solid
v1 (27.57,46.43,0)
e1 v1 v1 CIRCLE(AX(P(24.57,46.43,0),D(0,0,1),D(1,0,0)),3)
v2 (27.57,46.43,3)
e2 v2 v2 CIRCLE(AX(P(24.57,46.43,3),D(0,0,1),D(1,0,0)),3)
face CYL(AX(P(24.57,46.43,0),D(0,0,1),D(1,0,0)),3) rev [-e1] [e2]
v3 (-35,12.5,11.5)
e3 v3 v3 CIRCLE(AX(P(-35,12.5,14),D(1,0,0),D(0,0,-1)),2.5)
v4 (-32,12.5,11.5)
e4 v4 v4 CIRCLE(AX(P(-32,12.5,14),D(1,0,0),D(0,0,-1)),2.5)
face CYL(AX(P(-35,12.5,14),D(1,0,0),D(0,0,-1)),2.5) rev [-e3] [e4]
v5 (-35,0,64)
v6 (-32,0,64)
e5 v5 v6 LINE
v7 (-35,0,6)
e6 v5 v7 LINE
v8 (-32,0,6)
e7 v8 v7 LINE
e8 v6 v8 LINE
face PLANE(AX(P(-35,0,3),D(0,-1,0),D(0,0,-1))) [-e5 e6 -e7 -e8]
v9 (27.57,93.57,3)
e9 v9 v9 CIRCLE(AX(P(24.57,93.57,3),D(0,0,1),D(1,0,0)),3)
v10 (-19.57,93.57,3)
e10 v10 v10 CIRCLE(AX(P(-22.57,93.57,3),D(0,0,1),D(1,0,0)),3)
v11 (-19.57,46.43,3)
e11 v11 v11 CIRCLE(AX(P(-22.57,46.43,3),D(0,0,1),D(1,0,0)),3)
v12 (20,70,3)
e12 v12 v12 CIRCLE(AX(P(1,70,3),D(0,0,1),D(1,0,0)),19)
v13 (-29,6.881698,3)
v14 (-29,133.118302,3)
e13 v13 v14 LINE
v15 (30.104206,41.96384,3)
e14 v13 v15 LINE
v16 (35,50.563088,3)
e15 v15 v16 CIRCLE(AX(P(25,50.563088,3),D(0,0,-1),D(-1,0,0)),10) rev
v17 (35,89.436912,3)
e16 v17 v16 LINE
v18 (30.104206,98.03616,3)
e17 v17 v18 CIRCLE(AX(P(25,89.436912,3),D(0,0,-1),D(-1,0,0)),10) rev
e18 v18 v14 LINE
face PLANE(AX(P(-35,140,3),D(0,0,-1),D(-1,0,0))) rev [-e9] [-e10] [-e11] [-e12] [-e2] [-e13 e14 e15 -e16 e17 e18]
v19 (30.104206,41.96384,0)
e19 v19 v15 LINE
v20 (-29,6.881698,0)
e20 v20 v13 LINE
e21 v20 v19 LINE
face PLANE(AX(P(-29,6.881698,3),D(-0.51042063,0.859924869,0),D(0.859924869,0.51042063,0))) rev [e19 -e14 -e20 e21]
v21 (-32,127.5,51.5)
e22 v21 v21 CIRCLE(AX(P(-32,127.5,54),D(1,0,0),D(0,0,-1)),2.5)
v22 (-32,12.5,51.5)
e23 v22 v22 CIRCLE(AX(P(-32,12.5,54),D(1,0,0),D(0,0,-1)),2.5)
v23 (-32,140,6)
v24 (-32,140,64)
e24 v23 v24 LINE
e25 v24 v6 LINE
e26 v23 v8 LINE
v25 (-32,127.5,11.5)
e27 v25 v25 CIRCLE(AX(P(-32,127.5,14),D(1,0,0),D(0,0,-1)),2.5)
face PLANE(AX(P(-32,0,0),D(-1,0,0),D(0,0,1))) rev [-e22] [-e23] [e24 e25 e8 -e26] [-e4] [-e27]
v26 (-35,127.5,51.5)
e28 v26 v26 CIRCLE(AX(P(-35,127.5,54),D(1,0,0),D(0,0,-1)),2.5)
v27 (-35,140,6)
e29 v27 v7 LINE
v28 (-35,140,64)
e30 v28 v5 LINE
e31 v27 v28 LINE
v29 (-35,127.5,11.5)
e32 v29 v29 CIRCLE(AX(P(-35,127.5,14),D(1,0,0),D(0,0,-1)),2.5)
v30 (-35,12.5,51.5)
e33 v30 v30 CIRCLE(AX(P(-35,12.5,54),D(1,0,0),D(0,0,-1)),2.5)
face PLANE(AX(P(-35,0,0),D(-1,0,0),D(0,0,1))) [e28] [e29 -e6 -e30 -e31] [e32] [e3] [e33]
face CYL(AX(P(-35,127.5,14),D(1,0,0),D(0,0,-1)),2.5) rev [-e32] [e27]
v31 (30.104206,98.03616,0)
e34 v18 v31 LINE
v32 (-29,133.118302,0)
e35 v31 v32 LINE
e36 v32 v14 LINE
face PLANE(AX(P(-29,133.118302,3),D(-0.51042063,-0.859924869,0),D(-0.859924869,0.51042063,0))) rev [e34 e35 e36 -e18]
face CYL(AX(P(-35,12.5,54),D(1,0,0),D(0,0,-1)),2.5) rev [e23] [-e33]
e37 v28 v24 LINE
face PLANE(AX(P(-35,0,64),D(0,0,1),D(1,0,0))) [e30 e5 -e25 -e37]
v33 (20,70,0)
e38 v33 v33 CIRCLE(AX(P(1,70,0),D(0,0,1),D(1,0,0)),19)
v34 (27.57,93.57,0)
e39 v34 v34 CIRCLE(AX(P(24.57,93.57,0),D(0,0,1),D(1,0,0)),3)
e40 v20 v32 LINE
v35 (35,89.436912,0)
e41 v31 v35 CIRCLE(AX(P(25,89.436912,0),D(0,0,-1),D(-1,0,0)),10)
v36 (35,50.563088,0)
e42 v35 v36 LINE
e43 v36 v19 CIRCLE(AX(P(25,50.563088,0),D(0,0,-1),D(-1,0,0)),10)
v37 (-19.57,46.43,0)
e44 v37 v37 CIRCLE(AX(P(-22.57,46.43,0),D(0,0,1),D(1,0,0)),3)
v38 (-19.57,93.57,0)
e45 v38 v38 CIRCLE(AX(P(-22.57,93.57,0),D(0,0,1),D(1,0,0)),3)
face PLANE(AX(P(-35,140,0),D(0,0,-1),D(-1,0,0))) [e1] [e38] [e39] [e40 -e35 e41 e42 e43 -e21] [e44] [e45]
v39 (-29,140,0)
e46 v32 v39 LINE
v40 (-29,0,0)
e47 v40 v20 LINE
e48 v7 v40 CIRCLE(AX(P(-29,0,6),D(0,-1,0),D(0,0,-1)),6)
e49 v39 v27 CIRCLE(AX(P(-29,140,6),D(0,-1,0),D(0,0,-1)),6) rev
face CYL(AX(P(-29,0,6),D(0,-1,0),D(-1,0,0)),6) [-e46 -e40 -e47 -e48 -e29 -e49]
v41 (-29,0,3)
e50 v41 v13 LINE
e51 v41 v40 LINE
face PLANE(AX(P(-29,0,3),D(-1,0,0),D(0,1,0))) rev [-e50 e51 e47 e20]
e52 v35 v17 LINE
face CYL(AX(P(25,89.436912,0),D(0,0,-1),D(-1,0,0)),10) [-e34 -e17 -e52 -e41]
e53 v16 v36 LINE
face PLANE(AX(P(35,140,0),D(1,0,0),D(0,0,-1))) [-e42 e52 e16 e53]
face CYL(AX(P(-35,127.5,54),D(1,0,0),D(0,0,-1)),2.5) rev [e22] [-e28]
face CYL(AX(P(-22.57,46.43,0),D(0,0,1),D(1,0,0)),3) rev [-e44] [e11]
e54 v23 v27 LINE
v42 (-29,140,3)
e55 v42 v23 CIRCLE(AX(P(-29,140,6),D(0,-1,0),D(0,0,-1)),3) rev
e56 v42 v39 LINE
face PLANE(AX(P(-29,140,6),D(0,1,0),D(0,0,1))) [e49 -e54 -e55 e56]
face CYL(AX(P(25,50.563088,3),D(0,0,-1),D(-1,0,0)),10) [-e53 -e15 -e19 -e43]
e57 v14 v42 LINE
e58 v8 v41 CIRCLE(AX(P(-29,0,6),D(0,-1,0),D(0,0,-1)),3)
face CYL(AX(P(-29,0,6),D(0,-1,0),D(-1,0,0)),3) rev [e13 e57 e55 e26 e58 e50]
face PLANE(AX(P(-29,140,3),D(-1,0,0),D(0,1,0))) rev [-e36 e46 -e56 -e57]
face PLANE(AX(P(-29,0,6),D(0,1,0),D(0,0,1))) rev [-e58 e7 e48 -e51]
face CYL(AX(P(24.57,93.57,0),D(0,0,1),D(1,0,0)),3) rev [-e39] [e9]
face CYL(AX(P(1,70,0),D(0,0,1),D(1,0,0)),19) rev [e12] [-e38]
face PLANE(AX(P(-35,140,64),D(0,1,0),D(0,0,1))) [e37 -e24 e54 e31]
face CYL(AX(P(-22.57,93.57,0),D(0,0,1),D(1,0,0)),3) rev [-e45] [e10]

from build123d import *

# Parameters (mm, degrees)
SKETCH1_W                    = 70
SKETCH1_H                    = 3
BASE_FLANGE1_DEPTH           = 140
EDGE_FLANGE1_STRIP_W         = 18
EDGE_FLANGE1_STRIP_H         = 3
EDGE_FLANGE1_STRIP_CUT_DEPTH = 140
EDGE_FLANGE1_DEPTH           = 140
SKETCH9_R                    = 19
SKETCH9_R_2                  = 3
CUT_EXTRUDE1_DEPTH           = 10
SKETCH10_R                   = 2.5
CUT_EXTRUDE2_DEPTH           = 10
SKETCH11_R                   = 2.5
CUT_EXTRUDE3_DEPTH           = 3
CUT_EXTRUDE4_DEPTH           = 10
FILLET1_R                    = 10
FILLET2_R                    = 10


# Sheet-metal steps are written as plain solids
with BuildPart() as part:
    # Sketch1 → Base-Flange1 (new body)
    with BuildSketch(Plane(origin=(0, 0, 0), x_dir=(1, 0, 0), z_dir=(0, 1, 0))):
        with Locations((0, -1.5)):
            Rectangle(SKETCH1_W, SKETCH1_H)
    extrude(amount=BASE_FLANGE1_DEPTH)

    # Edge-Flange1 strip (across the edge) → Edge-Flange1 strip cut (cut)
    with BuildSketch(Plane(origin=(-35, 140, 3), x_dir=(1, 0, 0), z_dir=(0, -1, 0))):
        with Locations((-3, -1.5)):
            Rectangle(EDGE_FLANGE1_STRIP_W, EDGE_FLANGE1_STRIP_H)
    extrude(amount=EDGE_FLANGE1_STRIP_CUT_DEPTH, mode=Mode.SUBTRACT)

    # Edge-Flange1 section (across the edge) → Edge-Flange1 (add)
    with BuildSketch(Plane(origin=(-35, 140, 3), x_dir=(1, 0, 0), z_dir=(0, -1, 0))):
        with BuildLine():
            Line((0, 3), (0, 61))
            Line((0, 61), (3, 61))
            Line((3, 61), (3, 3))
            ThreePointArc((3, 3), (3.878679656, 0.878679656), (6, 0))
            Line((6, 0), (6, -3))
            ThreePointArc((6, -3), (1.757359313, -1.242640687), (0, 3))
        make_face()
    extrude(amount=EDGE_FLANGE1_DEPTH)

    # Sketch9 → Cut-Extrude1 (cut)
    with BuildSketch(Plane.XY.offset(3)):
        with Locations((1, 70)):
            Circle(SKETCH9_R)
        with Locations((-22.57, 93.57)):
            Circle(SKETCH9_R_2)
        with Locations((24.57, 93.57)):
            Circle(SKETCH9_R_2)
        with Locations((24.57, 46.43)):
            Circle(SKETCH9_R_2)
        with Locations((-22.57, 46.43)):
            Circle(SKETCH9_R_2)
    extrude(amount=-CUT_EXTRUDE1_DEPTH, mode=Mode.SUBTRACT)

    # Sketch10 → Cut-Extrude2 (cut)
    with BuildSketch(Plane(origin=(-32, 0, 0), x_dir=(0, 0, -1), z_dir=(1, 0, 0))):
        with Locations((-54, 127.5)):
            Circle(SKETCH10_R)
        with Locations((-14, 127.5)):
            Circle(SKETCH10_R)
        with Locations((-14, 12.5)):
            Circle(SKETCH10_R)
        with Locations((-54, 12.5)):
            Circle(SKETCH10_R)
    extrude(amount=-CUT_EXTRUDE2_DEPTH, mode=Mode.SUBTRACT)

    # Sketch11 → Cut-Extrude3 (cut)
    with BuildSketch(Plane.XY.offset(3)):
        with Locations((0, 120)):
            Circle(SKETCH11_R)
        with Locations((0, 20)):
            Circle(SKETCH11_R)
    extrude(amount=-CUT_EXTRUDE3_DEPTH, mode=Mode.SUBTRACT)

    # Sketch12 → Cut-Extrude4 (cut)
    with BuildSketch(Plane(origin=(0, 0, 0), x_dir=(-1, 0, 0), z_dir=(0, 0, -1))):
        Polygon((-35, 95.130192279), (-35, 140), (29, 140), (29, 133.118302038), align=None)
        Polygon((29, 0), (29, 6.881697962), (-35, 44.869807721), (-35, 0), align=None)
    extrude(amount=-CUT_EXTRUDE4_DEPTH, mode=Mode.SUBTRACT)

    # Fillet1
    fillet1_edges = [part.edges().sort_by_distance(p)[0] for p in [
        (35, 44.869807721, 1.5),
    ]]
    fillet(fillet1_edges, radius=FILLET1_R)

    # Fillet2
    fillet2_edges = [part.edges().sort_by_distance(p)[0] for p in [
        (35, 95.130192279, 1.5),
    ]]
    fillet(fillet2_edges, radius=FILLET2_R)


solid = part.part
